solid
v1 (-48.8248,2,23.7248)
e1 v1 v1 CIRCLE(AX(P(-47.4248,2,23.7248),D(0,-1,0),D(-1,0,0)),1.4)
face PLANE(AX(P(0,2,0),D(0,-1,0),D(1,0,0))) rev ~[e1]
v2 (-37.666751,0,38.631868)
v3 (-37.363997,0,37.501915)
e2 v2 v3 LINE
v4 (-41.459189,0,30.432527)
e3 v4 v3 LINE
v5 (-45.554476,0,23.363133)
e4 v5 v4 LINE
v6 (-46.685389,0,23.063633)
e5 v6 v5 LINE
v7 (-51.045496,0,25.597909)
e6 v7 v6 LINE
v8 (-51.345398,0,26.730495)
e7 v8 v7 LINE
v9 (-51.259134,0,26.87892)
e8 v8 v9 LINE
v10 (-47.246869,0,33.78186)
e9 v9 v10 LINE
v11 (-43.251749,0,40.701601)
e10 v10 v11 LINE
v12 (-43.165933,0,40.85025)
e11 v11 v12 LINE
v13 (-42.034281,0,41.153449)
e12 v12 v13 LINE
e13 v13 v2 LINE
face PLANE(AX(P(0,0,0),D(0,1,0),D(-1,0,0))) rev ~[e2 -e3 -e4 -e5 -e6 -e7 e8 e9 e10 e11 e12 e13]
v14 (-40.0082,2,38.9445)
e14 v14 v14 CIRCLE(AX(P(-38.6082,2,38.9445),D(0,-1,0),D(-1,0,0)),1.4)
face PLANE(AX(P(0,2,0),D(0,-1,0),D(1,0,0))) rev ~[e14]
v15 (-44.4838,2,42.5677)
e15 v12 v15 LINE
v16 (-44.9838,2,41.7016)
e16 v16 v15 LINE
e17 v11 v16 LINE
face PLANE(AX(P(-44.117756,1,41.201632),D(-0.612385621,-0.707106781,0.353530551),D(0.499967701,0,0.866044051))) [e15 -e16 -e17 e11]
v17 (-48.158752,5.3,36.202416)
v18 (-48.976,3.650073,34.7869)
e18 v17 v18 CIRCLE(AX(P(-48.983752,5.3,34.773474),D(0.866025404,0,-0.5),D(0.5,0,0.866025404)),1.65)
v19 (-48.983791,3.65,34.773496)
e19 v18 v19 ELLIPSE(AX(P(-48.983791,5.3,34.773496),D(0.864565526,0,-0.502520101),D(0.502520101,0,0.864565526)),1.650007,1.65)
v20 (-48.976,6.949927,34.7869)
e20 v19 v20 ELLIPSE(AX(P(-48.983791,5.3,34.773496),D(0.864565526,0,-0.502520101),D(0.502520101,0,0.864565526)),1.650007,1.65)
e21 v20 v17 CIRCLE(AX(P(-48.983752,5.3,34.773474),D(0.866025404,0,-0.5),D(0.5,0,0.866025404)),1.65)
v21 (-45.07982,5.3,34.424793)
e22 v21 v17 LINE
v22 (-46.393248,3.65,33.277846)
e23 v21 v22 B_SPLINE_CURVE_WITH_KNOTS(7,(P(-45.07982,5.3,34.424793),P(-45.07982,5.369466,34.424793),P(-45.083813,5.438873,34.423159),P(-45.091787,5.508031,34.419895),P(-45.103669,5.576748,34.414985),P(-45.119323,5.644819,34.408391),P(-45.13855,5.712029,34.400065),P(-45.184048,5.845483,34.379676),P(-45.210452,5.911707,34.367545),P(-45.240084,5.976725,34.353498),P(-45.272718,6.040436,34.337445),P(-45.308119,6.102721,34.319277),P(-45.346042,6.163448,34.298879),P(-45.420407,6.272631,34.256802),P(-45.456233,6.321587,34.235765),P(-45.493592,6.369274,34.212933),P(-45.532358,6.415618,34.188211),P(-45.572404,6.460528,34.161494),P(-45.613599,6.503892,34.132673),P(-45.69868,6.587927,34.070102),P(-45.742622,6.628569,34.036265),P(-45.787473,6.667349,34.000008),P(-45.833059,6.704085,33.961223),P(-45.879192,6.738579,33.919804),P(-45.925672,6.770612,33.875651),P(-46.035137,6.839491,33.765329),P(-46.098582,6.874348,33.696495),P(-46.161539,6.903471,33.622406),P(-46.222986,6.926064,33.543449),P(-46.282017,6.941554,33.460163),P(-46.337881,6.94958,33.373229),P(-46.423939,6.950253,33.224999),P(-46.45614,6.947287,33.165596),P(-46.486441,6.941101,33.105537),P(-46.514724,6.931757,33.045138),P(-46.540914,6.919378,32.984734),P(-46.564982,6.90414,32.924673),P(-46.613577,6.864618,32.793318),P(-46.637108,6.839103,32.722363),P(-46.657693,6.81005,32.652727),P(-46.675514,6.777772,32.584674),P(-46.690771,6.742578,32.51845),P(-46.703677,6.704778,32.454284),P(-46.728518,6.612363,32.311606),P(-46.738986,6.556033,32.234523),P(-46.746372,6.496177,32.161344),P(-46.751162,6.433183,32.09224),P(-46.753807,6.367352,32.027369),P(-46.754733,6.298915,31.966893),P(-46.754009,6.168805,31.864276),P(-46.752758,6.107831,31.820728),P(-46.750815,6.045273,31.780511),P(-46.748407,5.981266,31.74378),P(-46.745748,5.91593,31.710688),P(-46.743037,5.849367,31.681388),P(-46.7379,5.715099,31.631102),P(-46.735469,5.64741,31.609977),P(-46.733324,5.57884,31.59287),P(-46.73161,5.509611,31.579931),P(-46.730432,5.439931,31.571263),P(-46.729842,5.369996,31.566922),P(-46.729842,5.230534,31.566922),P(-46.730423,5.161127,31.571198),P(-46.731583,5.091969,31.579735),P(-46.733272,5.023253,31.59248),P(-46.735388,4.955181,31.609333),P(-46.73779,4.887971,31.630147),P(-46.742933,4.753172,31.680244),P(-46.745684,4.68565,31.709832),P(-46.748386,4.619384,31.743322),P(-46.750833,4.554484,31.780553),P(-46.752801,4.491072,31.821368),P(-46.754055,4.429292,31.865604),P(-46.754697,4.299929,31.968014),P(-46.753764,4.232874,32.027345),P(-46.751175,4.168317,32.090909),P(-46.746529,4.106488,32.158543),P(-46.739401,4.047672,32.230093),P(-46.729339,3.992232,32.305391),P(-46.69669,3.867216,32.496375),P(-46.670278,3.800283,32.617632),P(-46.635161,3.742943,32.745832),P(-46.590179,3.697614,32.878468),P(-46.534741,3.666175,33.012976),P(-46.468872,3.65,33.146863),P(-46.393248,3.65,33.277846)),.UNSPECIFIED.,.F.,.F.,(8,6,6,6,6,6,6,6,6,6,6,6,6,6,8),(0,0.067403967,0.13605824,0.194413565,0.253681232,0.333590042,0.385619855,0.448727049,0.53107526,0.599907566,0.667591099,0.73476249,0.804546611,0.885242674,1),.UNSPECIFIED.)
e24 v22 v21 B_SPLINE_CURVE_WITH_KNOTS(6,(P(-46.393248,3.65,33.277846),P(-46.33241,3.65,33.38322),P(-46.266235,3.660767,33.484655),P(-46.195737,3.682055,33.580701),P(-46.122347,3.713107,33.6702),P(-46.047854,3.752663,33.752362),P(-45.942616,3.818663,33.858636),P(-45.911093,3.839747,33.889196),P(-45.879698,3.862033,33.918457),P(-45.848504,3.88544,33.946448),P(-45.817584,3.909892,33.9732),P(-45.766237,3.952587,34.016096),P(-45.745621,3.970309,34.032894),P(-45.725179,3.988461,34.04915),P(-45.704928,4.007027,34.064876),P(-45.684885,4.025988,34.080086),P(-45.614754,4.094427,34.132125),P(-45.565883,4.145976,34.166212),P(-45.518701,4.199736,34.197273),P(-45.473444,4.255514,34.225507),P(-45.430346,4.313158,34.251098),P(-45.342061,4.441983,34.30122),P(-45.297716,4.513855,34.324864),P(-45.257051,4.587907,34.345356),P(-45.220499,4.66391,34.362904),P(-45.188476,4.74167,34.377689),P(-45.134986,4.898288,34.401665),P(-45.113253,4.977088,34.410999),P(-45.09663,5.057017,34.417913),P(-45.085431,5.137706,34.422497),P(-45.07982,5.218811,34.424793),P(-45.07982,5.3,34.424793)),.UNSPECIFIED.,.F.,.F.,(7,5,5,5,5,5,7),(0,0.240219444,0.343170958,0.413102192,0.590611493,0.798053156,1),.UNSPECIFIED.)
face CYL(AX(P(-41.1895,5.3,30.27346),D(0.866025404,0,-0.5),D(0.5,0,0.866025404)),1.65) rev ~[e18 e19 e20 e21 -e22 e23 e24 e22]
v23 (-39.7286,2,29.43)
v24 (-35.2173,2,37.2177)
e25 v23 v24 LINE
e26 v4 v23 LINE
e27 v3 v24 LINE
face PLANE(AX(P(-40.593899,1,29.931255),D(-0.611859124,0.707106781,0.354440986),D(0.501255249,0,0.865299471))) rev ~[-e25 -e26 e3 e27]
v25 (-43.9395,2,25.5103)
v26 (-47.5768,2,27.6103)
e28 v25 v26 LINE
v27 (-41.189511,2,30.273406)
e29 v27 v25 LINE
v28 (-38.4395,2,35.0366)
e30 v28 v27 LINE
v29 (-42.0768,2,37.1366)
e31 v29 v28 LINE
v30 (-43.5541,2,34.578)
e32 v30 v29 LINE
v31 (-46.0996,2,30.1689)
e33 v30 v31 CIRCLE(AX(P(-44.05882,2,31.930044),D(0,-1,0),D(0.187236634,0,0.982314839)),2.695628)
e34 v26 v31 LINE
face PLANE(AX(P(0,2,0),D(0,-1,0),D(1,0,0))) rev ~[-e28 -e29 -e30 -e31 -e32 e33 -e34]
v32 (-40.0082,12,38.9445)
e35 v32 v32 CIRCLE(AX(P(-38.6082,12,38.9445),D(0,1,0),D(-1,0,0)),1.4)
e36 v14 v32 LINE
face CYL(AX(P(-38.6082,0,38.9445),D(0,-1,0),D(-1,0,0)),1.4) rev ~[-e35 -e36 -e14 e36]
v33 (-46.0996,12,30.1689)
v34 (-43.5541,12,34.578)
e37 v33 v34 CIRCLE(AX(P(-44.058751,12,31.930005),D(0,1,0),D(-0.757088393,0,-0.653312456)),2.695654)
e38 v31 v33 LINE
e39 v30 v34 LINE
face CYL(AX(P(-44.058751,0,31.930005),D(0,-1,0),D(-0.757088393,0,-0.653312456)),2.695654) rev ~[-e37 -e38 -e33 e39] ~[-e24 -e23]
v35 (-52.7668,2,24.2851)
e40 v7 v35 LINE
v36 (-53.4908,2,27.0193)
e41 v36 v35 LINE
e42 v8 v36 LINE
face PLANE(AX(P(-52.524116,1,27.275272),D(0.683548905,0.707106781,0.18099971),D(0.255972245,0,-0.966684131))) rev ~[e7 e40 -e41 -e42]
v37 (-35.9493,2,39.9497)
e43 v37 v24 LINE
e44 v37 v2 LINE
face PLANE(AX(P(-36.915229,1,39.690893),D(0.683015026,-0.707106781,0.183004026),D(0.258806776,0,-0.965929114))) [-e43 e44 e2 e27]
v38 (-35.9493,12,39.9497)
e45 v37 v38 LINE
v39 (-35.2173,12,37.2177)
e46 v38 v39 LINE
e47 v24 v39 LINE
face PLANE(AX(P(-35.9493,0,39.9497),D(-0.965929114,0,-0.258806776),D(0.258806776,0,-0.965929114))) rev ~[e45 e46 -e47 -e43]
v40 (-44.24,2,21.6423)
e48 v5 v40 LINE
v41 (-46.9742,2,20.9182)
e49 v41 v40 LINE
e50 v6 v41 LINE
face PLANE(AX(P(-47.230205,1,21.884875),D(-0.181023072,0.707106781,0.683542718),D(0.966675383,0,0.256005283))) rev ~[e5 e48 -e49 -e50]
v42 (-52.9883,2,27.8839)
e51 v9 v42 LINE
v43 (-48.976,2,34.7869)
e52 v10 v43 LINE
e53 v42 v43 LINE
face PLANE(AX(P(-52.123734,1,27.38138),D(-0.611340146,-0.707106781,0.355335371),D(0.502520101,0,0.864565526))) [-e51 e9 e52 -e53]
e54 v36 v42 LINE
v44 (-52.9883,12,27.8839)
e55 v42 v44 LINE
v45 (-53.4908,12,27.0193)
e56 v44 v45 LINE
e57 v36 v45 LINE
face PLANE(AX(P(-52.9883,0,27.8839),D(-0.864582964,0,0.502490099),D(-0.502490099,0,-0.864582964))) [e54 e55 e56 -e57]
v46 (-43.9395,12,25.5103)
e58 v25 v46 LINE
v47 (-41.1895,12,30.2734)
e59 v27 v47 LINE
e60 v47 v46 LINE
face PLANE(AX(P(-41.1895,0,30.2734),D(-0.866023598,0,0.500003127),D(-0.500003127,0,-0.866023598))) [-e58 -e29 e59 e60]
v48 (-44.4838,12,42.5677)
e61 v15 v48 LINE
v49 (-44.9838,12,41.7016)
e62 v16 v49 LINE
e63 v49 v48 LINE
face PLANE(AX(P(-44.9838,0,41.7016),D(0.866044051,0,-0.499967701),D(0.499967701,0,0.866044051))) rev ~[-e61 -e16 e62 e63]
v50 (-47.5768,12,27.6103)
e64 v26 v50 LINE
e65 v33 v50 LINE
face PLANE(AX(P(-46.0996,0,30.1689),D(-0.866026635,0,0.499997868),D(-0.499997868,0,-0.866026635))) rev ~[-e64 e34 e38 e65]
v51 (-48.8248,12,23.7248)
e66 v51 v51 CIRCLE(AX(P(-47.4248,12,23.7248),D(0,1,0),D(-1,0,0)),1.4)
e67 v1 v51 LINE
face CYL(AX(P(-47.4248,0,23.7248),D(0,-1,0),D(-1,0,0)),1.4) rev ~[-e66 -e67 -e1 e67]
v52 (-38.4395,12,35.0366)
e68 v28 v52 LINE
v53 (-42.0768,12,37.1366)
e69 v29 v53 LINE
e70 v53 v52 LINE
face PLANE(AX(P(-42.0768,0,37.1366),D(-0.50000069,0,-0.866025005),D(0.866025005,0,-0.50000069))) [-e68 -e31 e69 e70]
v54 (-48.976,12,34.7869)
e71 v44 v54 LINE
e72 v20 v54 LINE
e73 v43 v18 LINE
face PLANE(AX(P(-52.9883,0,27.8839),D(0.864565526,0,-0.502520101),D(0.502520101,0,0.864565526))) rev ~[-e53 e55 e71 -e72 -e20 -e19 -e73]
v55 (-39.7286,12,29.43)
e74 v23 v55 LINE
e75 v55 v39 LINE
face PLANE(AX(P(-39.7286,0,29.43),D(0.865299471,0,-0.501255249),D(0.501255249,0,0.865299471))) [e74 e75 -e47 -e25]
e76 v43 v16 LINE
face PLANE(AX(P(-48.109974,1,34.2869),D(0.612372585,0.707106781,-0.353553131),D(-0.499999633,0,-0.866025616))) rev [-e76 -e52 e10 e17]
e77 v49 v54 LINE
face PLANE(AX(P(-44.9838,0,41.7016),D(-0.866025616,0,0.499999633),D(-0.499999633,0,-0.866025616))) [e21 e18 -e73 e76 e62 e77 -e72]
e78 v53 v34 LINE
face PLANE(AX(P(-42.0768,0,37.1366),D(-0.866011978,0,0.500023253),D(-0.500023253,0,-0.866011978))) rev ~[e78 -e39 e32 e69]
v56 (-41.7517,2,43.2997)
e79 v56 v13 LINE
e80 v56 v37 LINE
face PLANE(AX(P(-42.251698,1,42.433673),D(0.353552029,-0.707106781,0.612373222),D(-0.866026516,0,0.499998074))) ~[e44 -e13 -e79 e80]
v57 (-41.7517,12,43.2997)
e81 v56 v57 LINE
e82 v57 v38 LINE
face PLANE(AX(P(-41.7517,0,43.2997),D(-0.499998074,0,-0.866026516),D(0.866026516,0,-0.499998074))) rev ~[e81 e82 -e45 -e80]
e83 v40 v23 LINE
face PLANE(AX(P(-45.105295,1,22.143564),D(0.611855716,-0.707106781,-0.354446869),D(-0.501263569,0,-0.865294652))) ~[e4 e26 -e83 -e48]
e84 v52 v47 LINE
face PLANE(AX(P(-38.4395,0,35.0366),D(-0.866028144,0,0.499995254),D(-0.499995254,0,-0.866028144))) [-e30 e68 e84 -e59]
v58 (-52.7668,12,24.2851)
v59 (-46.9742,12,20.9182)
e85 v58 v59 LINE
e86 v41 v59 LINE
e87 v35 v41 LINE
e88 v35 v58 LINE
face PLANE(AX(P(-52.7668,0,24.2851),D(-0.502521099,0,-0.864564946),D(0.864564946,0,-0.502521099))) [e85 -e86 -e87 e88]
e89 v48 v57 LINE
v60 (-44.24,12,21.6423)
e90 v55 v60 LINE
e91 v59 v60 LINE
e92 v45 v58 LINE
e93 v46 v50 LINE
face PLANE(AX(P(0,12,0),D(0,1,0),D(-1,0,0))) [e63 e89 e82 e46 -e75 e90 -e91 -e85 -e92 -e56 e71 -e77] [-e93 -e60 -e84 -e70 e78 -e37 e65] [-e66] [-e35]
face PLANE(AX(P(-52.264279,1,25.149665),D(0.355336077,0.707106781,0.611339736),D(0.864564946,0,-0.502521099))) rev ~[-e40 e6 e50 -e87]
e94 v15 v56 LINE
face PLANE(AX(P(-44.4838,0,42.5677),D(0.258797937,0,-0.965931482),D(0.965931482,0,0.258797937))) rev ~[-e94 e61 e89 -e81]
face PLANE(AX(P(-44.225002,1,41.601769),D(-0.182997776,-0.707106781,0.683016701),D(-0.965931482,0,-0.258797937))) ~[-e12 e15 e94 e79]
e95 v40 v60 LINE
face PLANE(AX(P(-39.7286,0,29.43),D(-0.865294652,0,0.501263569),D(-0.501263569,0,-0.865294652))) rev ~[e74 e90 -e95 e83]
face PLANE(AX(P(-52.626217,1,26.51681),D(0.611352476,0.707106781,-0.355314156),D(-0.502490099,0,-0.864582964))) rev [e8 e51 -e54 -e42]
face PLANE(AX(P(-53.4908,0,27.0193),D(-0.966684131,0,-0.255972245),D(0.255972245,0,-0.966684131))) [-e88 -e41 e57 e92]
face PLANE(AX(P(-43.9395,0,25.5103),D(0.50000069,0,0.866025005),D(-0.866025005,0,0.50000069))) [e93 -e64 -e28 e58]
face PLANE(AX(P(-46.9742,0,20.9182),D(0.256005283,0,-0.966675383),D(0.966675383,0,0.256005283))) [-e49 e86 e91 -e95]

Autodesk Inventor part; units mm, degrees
ref_plane "YZ Plane" through (0, 0, 0) normal (1, 0, 0) x (0, 1, 0)
ref_plane "XZ Plane" through (0, 0, 0) normal (0, 1, 0) x (-1, 0, 0)
ref_plane "XY Plane" through (0, 0, 0) normal (0, 0, 1) x (1, 0, 0)
sketch "Sketch1" plane through (0, 0, 0) normal (0, 1, 0) x (-1, 0, 0)
  line L0 (41.1895, 30.2734) -> (43.9395, 25.5103)
  line L1 (43.9395, 25.5103) -> (47.5768, 27.6103)
  line L2 (42.0768, 37.1366) -> (38.4395, 35.0366)
  line L3 (38.4395, 35.0366) -> (41.1895, 30.2734)
  arc A0 (46.0996, 30.1689) -> (43.5541, 34.578) centre (44.0588, 31.93) ccw
  line L4 (42.0768, 37.1366) -> (43.5541, 34.578)
  line L5 (46.0996, 30.1689) -> (47.5768, 27.6103)
  line L6 (40.2582, 36.0866) -> (43.5582, 36.0866) construction
  circle A1 centre (38.6082, 38.9445) radius 1.4
  line L7 (41.7517, 43.2997) -> (35.9493, 39.9497)
  line L8 (35.9493, 39.9497) -> (35.2173, 37.2177)
  line L9 (39.7286, 29.43) -> (35.2173, 37.2177)
  line L10 (44.4838, 42.5677) -> (41.7517, 43.2997)
  line L11 (44.9838, 41.7016) -> (44.4838, 42.5677)
  line L12 (44.9838, 41.7016) -> (48.976, 34.7869)
  circle A2 centre (47.4248, 23.7248) radius 1.4
  line L13 (52.7668, 24.2851) -> (46.9742, 20.9182)
  line L14 (46.9742, 20.9182) -> (44.24, 21.6423)
  line L15 (39.7286, 29.43) -> (44.24, 21.6423)
  line L16 (53.4908, 27.0193) -> (52.7668, 24.2851)
  line L17 (52.9883, 27.8839) -> (53.4908, 27.0193)
  line L18 (52.9883, 27.8839) -> (48.976, 34.7869)
  point P0 (34.2173, 38.9497)
  point P1 (43.4838, 44.2997)
  point P2 (45.245, 19.9132)
  point P3 (54.4959, 25.2902)
  dimension "d0" = 5
  dimension "d29" = 2.8
  dimension "d32" = 2
  dimension "d33" = 2
  dimension "d34" = 2
  dimension "d35" = 2
  dimension "d41" = 2.8
extrude "Extrusion1" add sketch "Sketch1" along normal blind 12
sketch "Sketch3" plane through (-38.4395, 2, 35.0366) normal (-0.8660254, 0, 0.5) x (0.5, 0, 0.8660254)
  line L0 (-11, 0) -> (0, 0) projected
  line L1 (-5.5, 0) -> (-5.5, 3.3)
  circle A0 centre (-5.5, 3.3) radius 1.65
  point P0 (-11.1228, -2)
  dimension "d20" = 3.3
  dimension "d21" = 3.3
extrude "Extrusion3" cut sketch "Sketch3" along normal through all
sketch "Sketch4" plane through (0, 0, 0) normal (0, -1, 0) x (1, 0, 0)
  line L0 (-42.0768, 37.1366) -> (-38.4395, 35.0366) projected
  line L1 (-38.4395, 35.0366) -> (-43.9395, 25.5103) projected
  line L2 (-43.9395, 25.5103) -> (-47.5768, 27.6103) projected
  line L3 (-47.5768, 27.6103) -> (-46.0996, 30.1689) projected
  arc A0 (-43.5541, 34.578) -> (-46.0996, 30.1689) centre (-44.0588, 31.93) ccw projected
  line L4 (-43.5541, 34.578) -> (-42.0768, 37.1366) projected
  circle A1 centre (-47.4248, 23.7248) radius 1.4 projected
  circle A2 centre (-38.6082, 38.9445) radius 1.4 projected
  line L5 (-44.24, 21.6423) -> (-35.2173, 37.2177) projected
  line L6 (-35.2173, 37.2177) -> (-35.9493, 39.9497) projected
  line L7 (-35.9493, 39.9497) -> (-41.7517, 43.2997) projected
  line L8 (-41.7517, 43.2997) -> (-44.4838, 42.5677) projected
  line L9 (-44.4838, 42.5677) -> (-48.976, 34.7869) projected
  line L10 (-48.976, 34.7869) -> (-53.4908, 27.0193) projected
  line L11 (-53.4908, 27.0193) -> (-52.7668, 24.2851) projected
  line L12 (-52.7668, 24.2851) -> (-46.9742, 20.9182) projected
  line L13 (-46.9742, 20.9182) -> (-44.24, 21.6423) projected
  point P0 (0, 0)
extrude "Extrusion4" add sketch "Sketch4" against normal blind 2 contours L0 L1 L2 L3 A0 L4 | A1 | A2
chamfer "Chamfer2" distance 2 angle 45 9 edges at (-53.1288, 0, 25.6522) (-51.2334, 0, 30.9031) (-46.7299, 0, 38.6773) (-43.1177, 0, 42.9337) (-38.8505, 0, 41.6247) (-35.5833, 0, 38.5837) (-39.7286, 0, 29.43) (-45.6071, 0, 21.2803) (-49.8705, 0, 22.6017)
equation "\"d33\" = d32"
equation "\"d35\" = d34"
properties part number "TSOP Holder Straight" material "ABS Plastic"
